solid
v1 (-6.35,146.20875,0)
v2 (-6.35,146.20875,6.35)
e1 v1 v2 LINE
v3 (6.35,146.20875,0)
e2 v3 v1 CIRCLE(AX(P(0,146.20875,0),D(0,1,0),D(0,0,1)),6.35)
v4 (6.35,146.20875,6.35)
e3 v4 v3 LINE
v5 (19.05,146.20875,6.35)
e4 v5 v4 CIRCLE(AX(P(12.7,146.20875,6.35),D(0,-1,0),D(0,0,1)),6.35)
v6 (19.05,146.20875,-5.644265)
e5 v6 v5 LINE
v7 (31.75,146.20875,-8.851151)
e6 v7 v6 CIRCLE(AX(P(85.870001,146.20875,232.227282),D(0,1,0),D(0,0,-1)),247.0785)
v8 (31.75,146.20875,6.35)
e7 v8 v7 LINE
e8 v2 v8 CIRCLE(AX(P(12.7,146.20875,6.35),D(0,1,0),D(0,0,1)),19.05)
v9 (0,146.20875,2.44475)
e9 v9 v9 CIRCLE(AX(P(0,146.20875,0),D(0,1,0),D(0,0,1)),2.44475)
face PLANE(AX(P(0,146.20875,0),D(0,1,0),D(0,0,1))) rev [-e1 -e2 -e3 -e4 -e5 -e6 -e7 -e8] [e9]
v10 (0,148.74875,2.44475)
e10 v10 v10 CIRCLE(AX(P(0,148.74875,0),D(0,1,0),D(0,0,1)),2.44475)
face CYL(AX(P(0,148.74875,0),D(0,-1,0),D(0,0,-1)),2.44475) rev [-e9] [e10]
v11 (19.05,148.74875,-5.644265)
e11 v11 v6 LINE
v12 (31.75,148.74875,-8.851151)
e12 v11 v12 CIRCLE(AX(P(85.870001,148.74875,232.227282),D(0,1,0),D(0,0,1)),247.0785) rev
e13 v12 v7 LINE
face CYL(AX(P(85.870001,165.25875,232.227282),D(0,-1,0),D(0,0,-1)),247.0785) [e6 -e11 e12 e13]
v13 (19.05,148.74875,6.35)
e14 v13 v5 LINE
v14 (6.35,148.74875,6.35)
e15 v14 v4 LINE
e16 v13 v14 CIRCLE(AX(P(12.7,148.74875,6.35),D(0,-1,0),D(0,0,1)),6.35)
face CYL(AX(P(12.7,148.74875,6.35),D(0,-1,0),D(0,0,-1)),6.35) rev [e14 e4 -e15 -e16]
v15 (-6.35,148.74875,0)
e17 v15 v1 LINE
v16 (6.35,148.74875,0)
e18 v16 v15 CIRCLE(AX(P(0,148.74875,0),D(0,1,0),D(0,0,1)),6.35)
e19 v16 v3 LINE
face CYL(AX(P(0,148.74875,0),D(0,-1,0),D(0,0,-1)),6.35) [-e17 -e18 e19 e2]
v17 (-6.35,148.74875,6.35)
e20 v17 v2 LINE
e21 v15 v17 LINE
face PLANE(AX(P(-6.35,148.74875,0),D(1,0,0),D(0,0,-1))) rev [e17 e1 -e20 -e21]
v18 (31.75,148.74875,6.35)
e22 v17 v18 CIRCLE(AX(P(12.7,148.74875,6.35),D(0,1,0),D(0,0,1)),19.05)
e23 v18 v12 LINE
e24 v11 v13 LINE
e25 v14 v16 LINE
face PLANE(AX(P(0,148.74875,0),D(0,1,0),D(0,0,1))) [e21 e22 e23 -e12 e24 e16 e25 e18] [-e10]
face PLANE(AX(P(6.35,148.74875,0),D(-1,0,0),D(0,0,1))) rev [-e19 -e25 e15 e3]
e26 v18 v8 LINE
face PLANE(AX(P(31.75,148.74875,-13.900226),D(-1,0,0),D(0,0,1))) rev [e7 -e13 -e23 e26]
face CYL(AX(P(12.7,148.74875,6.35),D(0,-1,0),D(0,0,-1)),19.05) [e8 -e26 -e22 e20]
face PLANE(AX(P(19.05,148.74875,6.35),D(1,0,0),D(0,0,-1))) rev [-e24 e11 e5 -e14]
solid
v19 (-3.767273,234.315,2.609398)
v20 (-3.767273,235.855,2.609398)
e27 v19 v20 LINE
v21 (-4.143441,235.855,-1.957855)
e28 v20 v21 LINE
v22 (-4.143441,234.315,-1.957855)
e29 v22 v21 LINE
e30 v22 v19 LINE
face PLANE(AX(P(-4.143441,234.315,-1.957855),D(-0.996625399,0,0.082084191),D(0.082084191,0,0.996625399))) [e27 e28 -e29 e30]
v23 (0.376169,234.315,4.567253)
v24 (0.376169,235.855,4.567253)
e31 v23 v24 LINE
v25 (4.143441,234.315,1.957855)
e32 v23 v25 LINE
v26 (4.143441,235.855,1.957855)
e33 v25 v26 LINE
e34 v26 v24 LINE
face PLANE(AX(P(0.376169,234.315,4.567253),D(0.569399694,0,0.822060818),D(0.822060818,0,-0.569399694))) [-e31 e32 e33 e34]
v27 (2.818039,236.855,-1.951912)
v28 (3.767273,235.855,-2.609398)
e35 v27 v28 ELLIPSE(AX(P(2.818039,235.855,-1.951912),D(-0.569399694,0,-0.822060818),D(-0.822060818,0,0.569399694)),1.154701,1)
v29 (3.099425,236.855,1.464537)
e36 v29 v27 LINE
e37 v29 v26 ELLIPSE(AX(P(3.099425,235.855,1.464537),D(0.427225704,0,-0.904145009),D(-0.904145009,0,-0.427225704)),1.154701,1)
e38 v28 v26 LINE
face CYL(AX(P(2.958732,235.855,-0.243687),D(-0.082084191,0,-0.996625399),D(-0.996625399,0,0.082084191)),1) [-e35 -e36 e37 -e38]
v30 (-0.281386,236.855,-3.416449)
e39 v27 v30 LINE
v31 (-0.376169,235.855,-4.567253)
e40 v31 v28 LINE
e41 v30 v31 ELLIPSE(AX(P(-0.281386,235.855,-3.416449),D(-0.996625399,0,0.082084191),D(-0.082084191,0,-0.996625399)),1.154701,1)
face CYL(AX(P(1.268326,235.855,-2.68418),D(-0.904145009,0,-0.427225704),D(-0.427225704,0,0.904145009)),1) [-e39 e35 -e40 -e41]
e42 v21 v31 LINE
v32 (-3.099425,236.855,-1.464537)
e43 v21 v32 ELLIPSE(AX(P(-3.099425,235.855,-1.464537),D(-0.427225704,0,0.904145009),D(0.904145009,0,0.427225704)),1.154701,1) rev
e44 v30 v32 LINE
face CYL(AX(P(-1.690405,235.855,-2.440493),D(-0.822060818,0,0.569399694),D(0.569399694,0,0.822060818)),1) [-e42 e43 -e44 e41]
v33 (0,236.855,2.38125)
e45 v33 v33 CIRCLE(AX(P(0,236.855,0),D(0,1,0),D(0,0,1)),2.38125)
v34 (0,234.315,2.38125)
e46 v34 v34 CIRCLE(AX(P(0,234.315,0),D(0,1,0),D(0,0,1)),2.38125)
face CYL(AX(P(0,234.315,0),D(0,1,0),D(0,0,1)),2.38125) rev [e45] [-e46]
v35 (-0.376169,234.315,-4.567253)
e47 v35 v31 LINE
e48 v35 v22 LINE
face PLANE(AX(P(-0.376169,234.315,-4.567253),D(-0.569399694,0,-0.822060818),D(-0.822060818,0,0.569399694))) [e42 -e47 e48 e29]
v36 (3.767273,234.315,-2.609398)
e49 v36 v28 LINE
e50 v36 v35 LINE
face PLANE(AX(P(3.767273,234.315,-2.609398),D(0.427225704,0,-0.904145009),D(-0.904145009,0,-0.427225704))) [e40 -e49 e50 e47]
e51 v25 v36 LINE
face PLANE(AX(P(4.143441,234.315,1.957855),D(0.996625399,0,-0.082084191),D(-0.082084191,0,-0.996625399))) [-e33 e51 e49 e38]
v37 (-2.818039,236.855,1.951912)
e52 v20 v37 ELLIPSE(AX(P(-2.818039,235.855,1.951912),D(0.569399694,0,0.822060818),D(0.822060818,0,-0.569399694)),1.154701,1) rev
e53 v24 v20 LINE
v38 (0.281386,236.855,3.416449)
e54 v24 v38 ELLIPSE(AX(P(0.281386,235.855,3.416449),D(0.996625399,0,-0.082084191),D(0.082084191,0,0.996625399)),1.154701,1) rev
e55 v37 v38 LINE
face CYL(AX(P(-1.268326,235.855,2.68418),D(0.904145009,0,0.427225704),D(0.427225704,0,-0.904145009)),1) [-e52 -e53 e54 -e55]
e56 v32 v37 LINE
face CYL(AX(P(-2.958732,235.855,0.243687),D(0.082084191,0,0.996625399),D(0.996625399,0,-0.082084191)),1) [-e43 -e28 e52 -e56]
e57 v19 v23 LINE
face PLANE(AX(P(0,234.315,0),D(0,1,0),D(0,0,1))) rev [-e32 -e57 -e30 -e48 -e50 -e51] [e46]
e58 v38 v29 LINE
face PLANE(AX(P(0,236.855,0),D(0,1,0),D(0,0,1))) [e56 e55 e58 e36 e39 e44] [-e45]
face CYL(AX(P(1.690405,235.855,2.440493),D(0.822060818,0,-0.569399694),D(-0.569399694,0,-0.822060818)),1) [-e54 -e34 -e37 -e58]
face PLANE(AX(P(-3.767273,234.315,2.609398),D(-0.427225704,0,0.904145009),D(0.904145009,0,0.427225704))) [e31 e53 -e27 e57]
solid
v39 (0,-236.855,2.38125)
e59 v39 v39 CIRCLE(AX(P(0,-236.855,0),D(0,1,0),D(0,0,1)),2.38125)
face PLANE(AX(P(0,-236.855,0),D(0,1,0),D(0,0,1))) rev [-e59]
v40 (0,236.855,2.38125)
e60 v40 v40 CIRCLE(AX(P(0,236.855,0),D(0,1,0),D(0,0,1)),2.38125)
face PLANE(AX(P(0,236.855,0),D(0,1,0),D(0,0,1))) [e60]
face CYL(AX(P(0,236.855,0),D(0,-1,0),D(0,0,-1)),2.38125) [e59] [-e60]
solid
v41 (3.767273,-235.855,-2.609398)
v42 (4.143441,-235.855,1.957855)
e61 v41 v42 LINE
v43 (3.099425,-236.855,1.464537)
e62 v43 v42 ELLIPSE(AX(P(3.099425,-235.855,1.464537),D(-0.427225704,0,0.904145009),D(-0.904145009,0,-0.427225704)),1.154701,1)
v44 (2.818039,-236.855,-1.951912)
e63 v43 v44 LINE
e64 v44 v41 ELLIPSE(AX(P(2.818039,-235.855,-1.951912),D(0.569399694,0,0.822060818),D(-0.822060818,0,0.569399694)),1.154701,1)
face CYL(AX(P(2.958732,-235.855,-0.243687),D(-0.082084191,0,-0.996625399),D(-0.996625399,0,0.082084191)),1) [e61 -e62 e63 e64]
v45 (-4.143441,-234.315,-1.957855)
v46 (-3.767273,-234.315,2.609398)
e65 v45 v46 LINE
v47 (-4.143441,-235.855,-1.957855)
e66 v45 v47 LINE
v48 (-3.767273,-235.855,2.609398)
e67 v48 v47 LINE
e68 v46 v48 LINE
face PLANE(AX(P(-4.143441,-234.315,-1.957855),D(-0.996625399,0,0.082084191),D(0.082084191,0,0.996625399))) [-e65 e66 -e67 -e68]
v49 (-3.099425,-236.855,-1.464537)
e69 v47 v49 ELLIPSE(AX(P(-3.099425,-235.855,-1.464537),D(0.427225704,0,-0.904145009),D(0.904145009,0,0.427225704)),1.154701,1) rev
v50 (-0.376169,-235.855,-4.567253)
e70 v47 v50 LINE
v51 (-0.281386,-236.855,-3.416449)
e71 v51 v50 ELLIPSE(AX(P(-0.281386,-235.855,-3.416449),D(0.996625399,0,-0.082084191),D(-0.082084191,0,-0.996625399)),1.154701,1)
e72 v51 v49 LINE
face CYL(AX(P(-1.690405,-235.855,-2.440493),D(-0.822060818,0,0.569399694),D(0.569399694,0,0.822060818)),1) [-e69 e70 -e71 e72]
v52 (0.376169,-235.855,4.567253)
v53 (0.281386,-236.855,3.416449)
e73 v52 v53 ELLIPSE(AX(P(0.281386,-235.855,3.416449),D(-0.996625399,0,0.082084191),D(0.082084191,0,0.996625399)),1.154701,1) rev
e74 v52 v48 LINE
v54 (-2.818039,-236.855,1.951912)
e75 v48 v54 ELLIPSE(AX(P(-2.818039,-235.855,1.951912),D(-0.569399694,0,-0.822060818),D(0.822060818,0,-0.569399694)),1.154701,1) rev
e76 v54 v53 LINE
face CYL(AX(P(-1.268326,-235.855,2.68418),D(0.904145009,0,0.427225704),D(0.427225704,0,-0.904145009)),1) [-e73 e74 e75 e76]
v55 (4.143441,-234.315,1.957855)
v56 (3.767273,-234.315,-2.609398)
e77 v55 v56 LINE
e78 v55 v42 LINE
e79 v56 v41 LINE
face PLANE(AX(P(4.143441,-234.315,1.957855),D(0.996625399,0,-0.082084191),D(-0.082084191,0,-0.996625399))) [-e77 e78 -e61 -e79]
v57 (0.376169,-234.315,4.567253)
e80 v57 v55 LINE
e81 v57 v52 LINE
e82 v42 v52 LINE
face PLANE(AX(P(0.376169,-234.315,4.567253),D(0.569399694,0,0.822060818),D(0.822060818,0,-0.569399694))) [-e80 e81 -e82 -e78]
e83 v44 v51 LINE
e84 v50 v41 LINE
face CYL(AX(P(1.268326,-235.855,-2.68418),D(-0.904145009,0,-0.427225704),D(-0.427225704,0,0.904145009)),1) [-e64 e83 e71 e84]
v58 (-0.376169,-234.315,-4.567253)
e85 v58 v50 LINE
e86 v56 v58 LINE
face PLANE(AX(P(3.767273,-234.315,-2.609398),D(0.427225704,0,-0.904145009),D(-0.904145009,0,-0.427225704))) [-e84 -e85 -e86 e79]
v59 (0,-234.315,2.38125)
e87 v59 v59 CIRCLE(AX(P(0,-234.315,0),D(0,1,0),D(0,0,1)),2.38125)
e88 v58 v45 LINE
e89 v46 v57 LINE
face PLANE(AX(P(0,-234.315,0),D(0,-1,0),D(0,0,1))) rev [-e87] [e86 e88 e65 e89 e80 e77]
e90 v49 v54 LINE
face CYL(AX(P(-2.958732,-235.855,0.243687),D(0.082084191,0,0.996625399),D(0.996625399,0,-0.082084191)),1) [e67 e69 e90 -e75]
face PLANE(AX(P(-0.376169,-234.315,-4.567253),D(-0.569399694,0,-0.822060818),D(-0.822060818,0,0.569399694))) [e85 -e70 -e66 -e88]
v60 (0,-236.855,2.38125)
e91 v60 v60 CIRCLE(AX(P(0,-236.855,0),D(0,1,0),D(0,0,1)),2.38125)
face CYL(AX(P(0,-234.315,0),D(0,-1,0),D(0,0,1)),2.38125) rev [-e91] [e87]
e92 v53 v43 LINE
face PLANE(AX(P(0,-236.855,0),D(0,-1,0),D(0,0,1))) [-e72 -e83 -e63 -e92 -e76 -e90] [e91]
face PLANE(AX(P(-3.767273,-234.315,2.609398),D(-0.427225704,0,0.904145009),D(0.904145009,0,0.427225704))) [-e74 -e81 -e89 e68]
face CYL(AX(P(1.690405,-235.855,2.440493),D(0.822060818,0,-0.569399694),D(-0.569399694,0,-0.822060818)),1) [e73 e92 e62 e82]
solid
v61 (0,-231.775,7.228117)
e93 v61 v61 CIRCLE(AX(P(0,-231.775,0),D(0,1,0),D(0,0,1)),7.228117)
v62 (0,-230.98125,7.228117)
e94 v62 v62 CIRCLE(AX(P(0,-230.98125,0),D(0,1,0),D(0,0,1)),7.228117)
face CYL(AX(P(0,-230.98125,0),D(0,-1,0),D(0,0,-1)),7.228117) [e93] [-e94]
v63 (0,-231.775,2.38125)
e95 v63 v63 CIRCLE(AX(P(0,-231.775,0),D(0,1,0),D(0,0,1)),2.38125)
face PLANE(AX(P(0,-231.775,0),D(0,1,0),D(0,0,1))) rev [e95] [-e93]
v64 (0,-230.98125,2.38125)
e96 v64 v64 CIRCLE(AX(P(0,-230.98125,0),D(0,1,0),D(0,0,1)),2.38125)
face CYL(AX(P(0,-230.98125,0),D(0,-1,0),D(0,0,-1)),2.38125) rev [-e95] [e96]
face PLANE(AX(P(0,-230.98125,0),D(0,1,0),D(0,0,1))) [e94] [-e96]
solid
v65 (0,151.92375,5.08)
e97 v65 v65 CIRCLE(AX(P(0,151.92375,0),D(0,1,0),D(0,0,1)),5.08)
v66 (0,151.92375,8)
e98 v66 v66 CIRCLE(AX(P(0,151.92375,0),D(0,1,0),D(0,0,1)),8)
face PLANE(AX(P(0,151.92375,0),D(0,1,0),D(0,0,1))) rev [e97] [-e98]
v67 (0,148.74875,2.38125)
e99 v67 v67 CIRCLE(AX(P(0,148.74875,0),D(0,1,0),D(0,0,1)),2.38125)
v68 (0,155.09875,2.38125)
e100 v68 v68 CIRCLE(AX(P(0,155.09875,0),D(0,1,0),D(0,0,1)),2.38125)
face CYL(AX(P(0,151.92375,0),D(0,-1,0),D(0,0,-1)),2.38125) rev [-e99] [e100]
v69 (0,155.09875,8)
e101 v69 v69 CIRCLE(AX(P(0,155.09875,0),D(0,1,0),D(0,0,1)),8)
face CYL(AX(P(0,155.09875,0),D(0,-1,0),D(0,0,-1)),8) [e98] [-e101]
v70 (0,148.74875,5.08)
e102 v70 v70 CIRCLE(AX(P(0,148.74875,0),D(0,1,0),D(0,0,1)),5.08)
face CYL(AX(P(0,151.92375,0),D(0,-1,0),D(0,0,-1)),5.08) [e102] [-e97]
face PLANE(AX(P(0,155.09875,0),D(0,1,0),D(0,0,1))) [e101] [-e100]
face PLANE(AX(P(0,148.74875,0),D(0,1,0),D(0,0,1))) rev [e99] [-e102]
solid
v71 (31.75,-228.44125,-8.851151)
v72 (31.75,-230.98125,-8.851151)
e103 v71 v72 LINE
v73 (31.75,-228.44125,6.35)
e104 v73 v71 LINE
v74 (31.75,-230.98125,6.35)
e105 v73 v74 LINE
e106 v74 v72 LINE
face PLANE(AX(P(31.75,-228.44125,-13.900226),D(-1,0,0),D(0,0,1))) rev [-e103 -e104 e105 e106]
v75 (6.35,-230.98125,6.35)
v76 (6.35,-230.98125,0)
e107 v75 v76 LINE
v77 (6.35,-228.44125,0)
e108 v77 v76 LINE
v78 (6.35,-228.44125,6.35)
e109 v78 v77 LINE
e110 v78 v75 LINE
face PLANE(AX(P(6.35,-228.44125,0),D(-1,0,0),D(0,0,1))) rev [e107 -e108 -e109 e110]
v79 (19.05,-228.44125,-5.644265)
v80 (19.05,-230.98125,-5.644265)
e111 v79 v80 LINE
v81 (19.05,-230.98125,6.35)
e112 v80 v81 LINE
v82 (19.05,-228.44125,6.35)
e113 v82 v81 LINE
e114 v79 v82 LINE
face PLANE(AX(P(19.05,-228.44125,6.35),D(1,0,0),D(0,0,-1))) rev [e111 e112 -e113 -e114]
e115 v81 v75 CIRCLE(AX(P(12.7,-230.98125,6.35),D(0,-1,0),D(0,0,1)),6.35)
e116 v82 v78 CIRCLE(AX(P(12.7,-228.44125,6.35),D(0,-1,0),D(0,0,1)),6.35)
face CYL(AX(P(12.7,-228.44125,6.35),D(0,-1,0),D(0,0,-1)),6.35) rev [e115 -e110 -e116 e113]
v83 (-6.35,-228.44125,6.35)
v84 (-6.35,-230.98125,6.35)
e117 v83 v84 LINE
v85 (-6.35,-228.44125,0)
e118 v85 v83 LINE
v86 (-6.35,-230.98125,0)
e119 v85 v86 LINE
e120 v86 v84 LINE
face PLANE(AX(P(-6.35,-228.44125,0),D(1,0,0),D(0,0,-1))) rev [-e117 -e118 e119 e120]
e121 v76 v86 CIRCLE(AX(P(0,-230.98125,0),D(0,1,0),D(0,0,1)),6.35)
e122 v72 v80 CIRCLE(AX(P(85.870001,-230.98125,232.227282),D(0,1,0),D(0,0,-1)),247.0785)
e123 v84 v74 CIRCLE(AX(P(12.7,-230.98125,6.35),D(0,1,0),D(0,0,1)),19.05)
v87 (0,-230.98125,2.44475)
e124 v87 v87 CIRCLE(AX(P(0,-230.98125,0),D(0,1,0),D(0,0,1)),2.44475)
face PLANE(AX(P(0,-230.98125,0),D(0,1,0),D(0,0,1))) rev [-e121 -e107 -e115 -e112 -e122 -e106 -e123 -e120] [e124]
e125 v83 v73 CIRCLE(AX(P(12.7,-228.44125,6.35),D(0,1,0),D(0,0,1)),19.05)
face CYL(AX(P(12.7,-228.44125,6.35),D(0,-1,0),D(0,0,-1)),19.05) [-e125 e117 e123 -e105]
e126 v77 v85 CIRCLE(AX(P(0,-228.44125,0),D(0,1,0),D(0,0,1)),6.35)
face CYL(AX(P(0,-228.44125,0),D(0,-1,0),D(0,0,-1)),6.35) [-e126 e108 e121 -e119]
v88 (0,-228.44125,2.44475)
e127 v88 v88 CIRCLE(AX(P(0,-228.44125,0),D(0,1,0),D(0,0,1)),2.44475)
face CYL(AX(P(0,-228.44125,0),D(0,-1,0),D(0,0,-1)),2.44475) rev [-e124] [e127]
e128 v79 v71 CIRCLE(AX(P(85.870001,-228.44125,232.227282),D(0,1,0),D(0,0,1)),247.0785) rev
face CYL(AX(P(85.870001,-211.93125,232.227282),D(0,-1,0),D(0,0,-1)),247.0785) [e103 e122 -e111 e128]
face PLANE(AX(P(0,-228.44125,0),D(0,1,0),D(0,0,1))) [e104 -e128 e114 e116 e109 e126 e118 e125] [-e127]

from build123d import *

# Parameters (mm, degrees)
SKETCH1_R              = 2.38125
BOSS_EXTRUDE1_DEPTH    = 236.855
SKETCH2_R              = 2.38125
BOSS_EXTRUDE2_DEPTH    = 2.54
FILLET1_R              = 1
SKETCH3_R              = 7.228116805
SKETCH3_R_2            = 2.38125
BOSS_EXTRUDE3_DEPTH    = 0.79375
SKETCH4_R              = 2.38125
BOSS_EXTRUDE4_DEPTH    = 2.54
CUT_EXTRUDE1_DEPTH     = 19.05
MOVE_START             = -230.98125
MOVE_FACE1_OUTLINE_R   = 2.44475
MOVE_FACE1_OUTLINE_R_2 = 2.38125
MOVE_FACE1_DEPTH       = 2.54
SKETCH7_R              = 5.08
SKETCH7_R_2            = 2.38125
BOSS_EXTRUDE6_DEPTH    = 3.175
BOSS_EXTRUDE7_START    = 3.175
SKETCH8_R              = 8
SKETCH8_R_2            = 2.38125
BOSS_EXTRUDE7_DEPTH    = 3.175


# Read off the part's stored shape, not the designer's step: Move Face1
with BuildPart() as part:
    # Sketch1 → Boss-Extrude1 (new, symmetric)
    with BuildSketch(Plane(origin=(0, 0, 0), x_dir=(1, 0, 0), z_dir=(0, 1, 0))):
        with Locations(Location((0, 0, 0), (0, 0, 270))):
            Circle(SKETCH1_R)
    extrude(amount=BOSS_EXTRUDE1_DEPTH, both=True)


with BuildPart() as body_2:
    # Sketch2 → Boss-Extrude2 (new body)
    with BuildSketch(Plane(origin=(0, 236.855, 0), x_dir=(1, 0, 0), z_dir=(0, 1, 0))):
        Polygon((3.767272711, 2.609398093), (-0.376168682, 4.567252917), (-4.143441392, 1.957854824), (-3.767272711, -2.609398093), (0.376168682, -4.567252917), (4.143441392, -1.957854824), align=None)
        with Locations(Location((0, 0, 0), (0, 0, 270))):
            Circle(SKETCH2_R, mode=Mode.SUBTRACT)
    extrude(amount=-BOSS_EXTRUDE2_DEPTH)

    # Fillet1
    fillet1_edges = [body_2.edges().sort_by_distance(p)[0] for p in [
        (2.259805037, 236.855, 3.26255387),
        (-1.695552014, 236.855, 3.588325505),
        (-3.955357051, 236.855, 0.325771635),
        (-2.259805037, 236.855, -3.26255387),
        (1.695552014, 236.855, -3.588325505),
        (3.955357051, 236.855, -0.325771635),
    ]]
    fillet(fillet1_edges, radius=FILLET1_R)


with BuildPart() as body_3:
    # Mirror1: mirrored copy
    add(body_2.part.mirror(Plane.ZX))


with BuildPart() as body_4:
    # Sketch3 → Boss-Extrude3 (new body)
    with BuildSketch(Plane(origin=(0, -231.775, 0), x_dir=(1, 0, 0), z_dir=(0, 1, 0))):
        with Locations(Location((0, 0, 0), (0, 0, 270))):
            Circle(SKETCH3_R)
        with Locations(Location((0, 0, 0), (0, 0, 270))):
            Circle(SKETCH3_R_2, mode=Mode.SUBTRACT)
    extrude(amount=BOSS_EXTRUDE3_DEPTH)


with BuildPart() as body_5:
    # Sketch4 → Boss-Extrude4 (new body)
    with BuildSketch(Plane(origin=(0, -230.98125, 0), x_dir=(1, 0, 0), z_dir=(0, 1, 0))):
        with BuildLine():
            Line((6.35, 0), (6.35, -6.35))
            ThreePointArc((6.35, -6.35), (12.7, -12.7), (19.05, -6.35))
            Line((19.05, -6.35), (19.05, 13.900226486))
            Line((19.05, 13.900226486), (31.75, 13.900226486))
            Line((31.75, 13.900226486), (31.75, -6.35))
            ThreePointArc((31.75, -6.35), (12.7, -25.4), (-6.35, -6.35))
            Line((-6.35, -6.35), (-6.35, 0))
            ThreePointArc((-6.35, 0), (0, 6.35), (6.35, 0))
        make_face()
        with Locations(Location((0, 0, 0), (0, 0, 270))):
            Circle(SKETCH4_R, mode=Mode.SUBTRACT)
    extrude(amount=BOSS_EXTRUDE4_DEPTH)

    # Sketch5 → Cut-Extrude1 (cut)
    with BuildSketch(Plane.XZ.offset(230.98125)):
        with BuildLine():
            Line((19.05, -5.644264501), (19.05, -13.900226486))
            Line((19.05, -13.900226486), (31.75, -13.900226486))
            Line((31.75, -13.900226486), (31.75, -8.851150591))
            ThreePointArc((31.75, -8.851150591), (25.378745016, -7.331882129), (19.05, -5.644264501))
        make_face()
    extrude(amount=-CUT_EXTRUDE1_DEPTH, mode=Mode.SUBTRACT)

    # Move Face1 outline → Move Face1 (cut)
    with BuildSketch(Plane(origin=(0, 0, 0), x_dir=(1, 0, 0), z_dir=(0, 1, 0)).offset(MOVE_START)):
        Circle(MOVE_FACE1_OUTLINE_R)
        Circle(MOVE_FACE1_OUTLINE_R_2, mode=Mode.SUBTRACT)
    extrude(amount=MOVE_FACE1_DEPTH, mode=Mode.SUBTRACT)


with BuildPart() as body_6:
    # Body-Move/Copy1: copy of body 5
    add(body_5.part.moved(Location((0, 377.19, 0))))


with BuildPart() as body_7:
    # Sketch7 → Boss-Extrude6 (new body)
    with BuildSketch(Plane(origin=(0, 148.74875, 0), x_dir=(1, 0, 0), z_dir=(0, 1, 0))):
        with Locations(Location((0, 0, 0), (0, 0, 270))):
            Circle(SKETCH7_R)
        with Locations(Location((0, 0, 0), (0, 0, 270))):
            Circle(SKETCH7_R_2, mode=Mode.SUBTRACT)
    extrude(amount=BOSS_EXTRUDE6_DEPTH)

    # Sketch8 → Boss-Extrude7 (add)
    with BuildSketch(Plane(origin=(0, 151.92375, 0), x_dir=(1, 0, 0), z_dir=(0, 1, 0)).offset(BOSS_EXTRUDE7_START)):
        with Locations(Location((0, 0, 0), (0, 0, 270))):
            Circle(SKETCH8_R)
        with Locations(Location((0, 0, 0), (0, 0, 270))):
            Circle(SKETCH8_R_2, mode=Mode.SUBTRACT)
    extrude(amount=-BOSS_EXTRUDE7_DEPTH)


solid = Compound([part.part, body_2.part, body_3.part, body_4.part, body_5.part, body_6.part, body_7.part])
